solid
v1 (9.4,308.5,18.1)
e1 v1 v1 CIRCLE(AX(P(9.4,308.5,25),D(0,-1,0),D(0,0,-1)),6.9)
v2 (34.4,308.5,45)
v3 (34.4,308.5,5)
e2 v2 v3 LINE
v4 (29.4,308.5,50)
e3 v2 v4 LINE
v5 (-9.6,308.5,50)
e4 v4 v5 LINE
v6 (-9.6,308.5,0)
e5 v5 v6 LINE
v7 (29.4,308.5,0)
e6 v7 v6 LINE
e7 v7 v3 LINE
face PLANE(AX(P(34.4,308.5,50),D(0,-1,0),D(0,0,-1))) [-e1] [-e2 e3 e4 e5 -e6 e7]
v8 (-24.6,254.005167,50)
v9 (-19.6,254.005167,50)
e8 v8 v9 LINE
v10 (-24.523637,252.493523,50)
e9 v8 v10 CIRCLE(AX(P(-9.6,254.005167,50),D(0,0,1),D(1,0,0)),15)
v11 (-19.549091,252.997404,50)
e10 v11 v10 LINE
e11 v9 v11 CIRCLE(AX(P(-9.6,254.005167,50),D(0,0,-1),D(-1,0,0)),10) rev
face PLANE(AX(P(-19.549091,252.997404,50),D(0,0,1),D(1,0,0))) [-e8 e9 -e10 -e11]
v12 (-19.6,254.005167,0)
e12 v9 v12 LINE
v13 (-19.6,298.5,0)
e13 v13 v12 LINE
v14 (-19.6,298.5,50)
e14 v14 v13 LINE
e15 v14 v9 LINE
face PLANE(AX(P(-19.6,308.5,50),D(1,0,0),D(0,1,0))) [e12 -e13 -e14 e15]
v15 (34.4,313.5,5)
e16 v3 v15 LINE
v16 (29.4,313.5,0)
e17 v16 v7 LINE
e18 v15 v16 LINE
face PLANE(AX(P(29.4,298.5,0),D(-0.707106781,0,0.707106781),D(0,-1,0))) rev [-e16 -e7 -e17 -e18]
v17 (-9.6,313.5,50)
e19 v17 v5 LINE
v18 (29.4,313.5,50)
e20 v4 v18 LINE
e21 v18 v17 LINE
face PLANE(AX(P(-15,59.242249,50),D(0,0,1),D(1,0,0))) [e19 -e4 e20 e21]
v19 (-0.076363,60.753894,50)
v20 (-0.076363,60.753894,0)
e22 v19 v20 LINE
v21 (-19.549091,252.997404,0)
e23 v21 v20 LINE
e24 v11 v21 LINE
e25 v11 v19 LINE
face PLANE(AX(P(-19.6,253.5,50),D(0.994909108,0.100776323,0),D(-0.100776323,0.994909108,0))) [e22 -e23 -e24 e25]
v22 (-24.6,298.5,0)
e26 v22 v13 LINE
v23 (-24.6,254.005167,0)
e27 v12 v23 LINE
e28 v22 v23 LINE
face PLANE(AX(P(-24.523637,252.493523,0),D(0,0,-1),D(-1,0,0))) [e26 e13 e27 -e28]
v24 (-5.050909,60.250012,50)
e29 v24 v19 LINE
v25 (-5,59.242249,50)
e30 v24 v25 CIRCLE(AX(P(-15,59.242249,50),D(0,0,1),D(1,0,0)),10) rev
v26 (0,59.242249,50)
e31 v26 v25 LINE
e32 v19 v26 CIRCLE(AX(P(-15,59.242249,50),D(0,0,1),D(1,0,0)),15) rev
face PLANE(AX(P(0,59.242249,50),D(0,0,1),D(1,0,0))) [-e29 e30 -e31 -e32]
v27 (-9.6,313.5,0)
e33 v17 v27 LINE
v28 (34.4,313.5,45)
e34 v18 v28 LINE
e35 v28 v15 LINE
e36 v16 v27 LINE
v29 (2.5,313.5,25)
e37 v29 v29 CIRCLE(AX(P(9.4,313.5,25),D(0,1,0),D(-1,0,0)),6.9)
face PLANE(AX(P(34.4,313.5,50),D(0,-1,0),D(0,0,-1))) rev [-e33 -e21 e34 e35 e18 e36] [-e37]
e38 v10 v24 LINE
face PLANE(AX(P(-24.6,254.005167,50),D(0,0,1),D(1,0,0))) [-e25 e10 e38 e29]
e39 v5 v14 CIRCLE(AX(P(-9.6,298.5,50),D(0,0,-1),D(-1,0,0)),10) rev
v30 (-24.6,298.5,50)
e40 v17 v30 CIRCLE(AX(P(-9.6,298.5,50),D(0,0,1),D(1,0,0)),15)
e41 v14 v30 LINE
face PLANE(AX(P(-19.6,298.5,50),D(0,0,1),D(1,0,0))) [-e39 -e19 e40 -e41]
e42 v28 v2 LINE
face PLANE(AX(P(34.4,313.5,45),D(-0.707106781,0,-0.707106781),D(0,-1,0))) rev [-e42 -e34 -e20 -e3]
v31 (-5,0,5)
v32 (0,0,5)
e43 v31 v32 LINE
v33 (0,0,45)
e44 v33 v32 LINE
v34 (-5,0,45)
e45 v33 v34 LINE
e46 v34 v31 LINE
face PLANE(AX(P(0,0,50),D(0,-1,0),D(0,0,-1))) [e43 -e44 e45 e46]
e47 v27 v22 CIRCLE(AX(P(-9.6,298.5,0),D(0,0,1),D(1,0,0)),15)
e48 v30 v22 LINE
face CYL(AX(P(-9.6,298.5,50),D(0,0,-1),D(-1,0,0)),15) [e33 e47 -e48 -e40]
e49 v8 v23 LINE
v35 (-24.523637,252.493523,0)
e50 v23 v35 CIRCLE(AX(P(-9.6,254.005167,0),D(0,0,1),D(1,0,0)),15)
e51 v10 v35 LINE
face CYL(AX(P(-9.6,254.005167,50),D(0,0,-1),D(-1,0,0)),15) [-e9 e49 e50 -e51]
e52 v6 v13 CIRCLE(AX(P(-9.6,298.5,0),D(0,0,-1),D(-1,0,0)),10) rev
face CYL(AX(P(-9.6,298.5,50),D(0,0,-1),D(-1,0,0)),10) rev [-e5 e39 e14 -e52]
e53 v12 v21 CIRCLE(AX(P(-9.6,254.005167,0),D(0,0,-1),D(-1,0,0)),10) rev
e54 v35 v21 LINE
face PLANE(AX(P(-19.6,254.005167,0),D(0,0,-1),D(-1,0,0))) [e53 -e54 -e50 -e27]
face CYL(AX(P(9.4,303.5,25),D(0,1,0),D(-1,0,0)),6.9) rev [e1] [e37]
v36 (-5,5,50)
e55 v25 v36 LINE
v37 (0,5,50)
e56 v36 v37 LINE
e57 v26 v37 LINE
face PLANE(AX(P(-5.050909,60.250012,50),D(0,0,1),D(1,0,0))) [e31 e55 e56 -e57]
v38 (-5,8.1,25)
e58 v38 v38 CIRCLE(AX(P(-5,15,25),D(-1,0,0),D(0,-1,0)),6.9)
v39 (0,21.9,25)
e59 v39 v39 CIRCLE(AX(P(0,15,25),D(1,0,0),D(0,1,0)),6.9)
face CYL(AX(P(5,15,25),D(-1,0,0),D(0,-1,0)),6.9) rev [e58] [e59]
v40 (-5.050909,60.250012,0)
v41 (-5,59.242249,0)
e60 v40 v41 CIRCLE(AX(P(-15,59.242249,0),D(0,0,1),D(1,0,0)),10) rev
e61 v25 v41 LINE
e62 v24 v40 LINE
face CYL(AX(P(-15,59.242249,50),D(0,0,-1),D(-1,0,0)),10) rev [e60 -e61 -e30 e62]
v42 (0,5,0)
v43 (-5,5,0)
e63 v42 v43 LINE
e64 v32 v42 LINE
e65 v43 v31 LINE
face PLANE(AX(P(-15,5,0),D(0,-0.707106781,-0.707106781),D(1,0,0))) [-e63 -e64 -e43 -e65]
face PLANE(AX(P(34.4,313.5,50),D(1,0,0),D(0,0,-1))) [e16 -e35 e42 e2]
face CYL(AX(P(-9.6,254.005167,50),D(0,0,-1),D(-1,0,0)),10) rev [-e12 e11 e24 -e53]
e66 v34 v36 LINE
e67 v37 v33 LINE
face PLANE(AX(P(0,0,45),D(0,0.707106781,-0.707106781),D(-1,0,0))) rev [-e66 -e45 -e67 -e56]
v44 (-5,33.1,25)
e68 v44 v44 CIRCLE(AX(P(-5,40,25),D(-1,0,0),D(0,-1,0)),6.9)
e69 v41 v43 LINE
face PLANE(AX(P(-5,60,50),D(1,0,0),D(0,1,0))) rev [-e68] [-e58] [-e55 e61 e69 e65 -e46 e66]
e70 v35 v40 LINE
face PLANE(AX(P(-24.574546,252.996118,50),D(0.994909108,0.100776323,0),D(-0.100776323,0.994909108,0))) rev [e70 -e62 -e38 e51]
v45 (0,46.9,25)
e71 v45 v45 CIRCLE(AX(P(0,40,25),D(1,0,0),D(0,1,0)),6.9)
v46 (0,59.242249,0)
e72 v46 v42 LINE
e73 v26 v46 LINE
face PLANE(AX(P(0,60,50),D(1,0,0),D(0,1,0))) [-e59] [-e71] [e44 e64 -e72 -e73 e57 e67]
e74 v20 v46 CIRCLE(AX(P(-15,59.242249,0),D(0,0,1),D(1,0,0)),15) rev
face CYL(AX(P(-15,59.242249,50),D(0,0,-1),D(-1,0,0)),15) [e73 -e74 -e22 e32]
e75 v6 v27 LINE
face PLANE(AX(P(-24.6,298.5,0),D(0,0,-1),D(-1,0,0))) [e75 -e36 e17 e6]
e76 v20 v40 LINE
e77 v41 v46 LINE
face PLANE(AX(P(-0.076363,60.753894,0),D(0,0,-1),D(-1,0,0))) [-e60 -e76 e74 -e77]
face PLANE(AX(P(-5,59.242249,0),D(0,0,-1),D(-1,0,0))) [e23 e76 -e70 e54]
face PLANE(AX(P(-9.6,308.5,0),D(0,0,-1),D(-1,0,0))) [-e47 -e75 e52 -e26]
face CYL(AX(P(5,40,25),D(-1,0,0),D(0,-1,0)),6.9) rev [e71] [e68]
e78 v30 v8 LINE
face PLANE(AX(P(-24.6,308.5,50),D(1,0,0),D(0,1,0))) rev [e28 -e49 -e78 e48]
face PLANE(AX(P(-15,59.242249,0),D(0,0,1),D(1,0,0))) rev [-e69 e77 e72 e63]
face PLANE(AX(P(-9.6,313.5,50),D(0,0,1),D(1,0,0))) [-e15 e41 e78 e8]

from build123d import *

# Parameters (mm, degrees)
SM_BASE_FLANGE_1_DEPTH = 50
SKETCH_6_R             = 6.9
CUT_EXTRUDE_1_DEPTH    = 10
SKETCH_7_R             = 6.9
CUT_EXTRUDE_2_DEPTH    = 10
OTHER_START            = 20.788939367
OTHER_1_OUTLINE_W      = 10
OTHER_1_OUTLINE_H      = 8
OTHER_1_DEPTH          = 3.535533906
OTHER_START_2          = 56.144278426
OTHER_1_2_OUTLINE_W    = 38
OTHER_1_2_OUTLINE_H    = 8
OTHER_1_2_DEPTH        = 3.535533906
OTHER_1_3_OUTLINE_W    = 7
OTHER_1_3_OUTLINE_H    = 10
OTHER_1_3_DEPTH        = 3.535533906
OTHER_START_3          = -35.355339059
OTHER_1_4_OUTLINE_W    = 7
OTHER_1_4_OUTLINE_H    = 38
OTHER_1_4_DEPTH        = 3.535533906


# Read off the part's stored shape, not the designer's step: Затупленный угол1
# Sheet-metal steps are written as plain solids
with BuildPart() as part:
    # Sketch 1 → Базовая кромка1 (new body)
    with BuildSketch(Plane.XY):
        with BuildLine():
            Line((34.4, 308.5), (-9.6, 308.5))
            ThreePointArc((-9.6, 308.5), (-16.671067812, 305.571067812), (-19.6, 298.5))
            Line((-19.6, 298.5), (-19.6, 254.005167492))
            ThreePointArc((-19.6, 254.005167492), (-19.58726466, 253.500643348), (-19.549091078, 252.997404261))
            Line((-19.549091078, 252.997404261), (-0.076363384, 60.753893608))
            ThreePointArc((-0.076363384, 60.753893608), (-0.01910301, 59.999034978), (0, 59.242248762))
            Line((0, 59.242248762), (0, 0))
            Line((0, 0), (-5, 0))
            Line((-5, 0), (-5, 59.242248762))
            ThreePointArc((-5, 59.242248762), (-5.01273534, 59.746772906), (-5.050908922, 60.250011993))
            Line((-5.050908922, 60.250011993), (-24.523636616, 252.493522646))
            ThreePointArc((-24.523636616, 252.493522646), (-24.58089699, 253.248381276), (-24.6, 254.005167492))
            Line((-24.6, 254.005167492), (-24.6, 298.5))
            ThreePointArc((-24.6, 298.5), (-20.206601718, 309.106601718), (-9.6, 313.5))
            Line((-9.6, 313.5), (34.4, 313.5))
            Line((34.4, 313.5), (34.4, 308.5))
        make_face()
    extrude(amount=SM_BASE_FLANGE_1_DEPTH)

    # Эскиз6 → Вырез-Вытянуть1 (cut)
    with BuildSketch(Plane.ZY.offset(5)):
        with Locations(Location((25, 15, 0), (0, 0, 270))):
            Circle(SKETCH_6_R)
        with Locations(Location((25, 40, 0), (0, 0, 270))):
            Circle(SKETCH_6_R)
    extrude(amount=-CUT_EXTRUDE_1_DEPTH, mode=Mode.SUBTRACT)

    # Эскиз7 → Вырез-Вытянуть2 (cut)
    with BuildSketch(Plane(origin=(0, 313.5, 0), x_dir=(1, 0, 0), z_dir=(0, 1, 0))):
        with Locations(Location((9.4, -25, 0), (0, 0, 180))):
            Circle(SKETCH_7_R)
    extrude(amount=-CUT_EXTRUDE_2_DEPTH, mode=Mode.SUBTRACT)

    # Other 1 outline → Other 1 (cut)
    with BuildSketch(Plane(origin=(0, 0, 0), x_dir=(0.707106781186548, 0, 0.707106781186547), z_dir=(0.707106781186547, 0, -0.707106781186548)).offset(OTHER_START)):
        with Locations((24, -311)):
            Rectangle(OTHER_1_OUTLINE_W, OTHER_1_OUTLINE_H)
    extrude(amount=OTHER_1_DEPTH, mode=Mode.SUBTRACT)

    # Other 1 2 outline → Other 1 2 (cut)
    with BuildSketch(Plane(origin=(0, 0, 0), x_dir=(0.707106781186548, 0, -0.707106781186547), z_dir=(0.707106781186547, 0, 0.707106781186548)).offset(OTHER_START_2)):
        with Locations((3, 311)):
            Rectangle(OTHER_1_2_OUTLINE_W, OTHER_1_2_OUTLINE_H)
    extrude(amount=OTHER_1_2_DEPTH, mode=Mode.SUBTRACT)

    # Other 1 3 outline → Other 1 3 (cut)
    with BuildSketch(Plane(origin=(0, 0, 0), x_dir=(1, 0, 0), z_dir=(0, 0.7071067811865476, 0.7071067811865476))):
        with Locations((-2.5, 0)):
            Rectangle(OTHER_1_3_OUTLINE_W, OTHER_1_3_OUTLINE_H)
    extrude(amount=OTHER_1_3_DEPTH, mode=Mode.SUBTRACT)

    # Other 1 4 outline → Other 1 4 (cut)
    with BuildSketch(Plane(origin=(0, 0, 0), x_dir=(1, 0, 0), z_dir=(0, 0.7071067811865476, -0.7071067811865476)).offset(OTHER_START_3)):
        with Locations((-2.5, -21)):
            Rectangle(OTHER_1_4_OUTLINE_W, OTHER_1_4_OUTLINE_H)
    extrude(amount=OTHER_1_4_DEPTH, mode=Mode.SUBTRACT)


solid = part.part
